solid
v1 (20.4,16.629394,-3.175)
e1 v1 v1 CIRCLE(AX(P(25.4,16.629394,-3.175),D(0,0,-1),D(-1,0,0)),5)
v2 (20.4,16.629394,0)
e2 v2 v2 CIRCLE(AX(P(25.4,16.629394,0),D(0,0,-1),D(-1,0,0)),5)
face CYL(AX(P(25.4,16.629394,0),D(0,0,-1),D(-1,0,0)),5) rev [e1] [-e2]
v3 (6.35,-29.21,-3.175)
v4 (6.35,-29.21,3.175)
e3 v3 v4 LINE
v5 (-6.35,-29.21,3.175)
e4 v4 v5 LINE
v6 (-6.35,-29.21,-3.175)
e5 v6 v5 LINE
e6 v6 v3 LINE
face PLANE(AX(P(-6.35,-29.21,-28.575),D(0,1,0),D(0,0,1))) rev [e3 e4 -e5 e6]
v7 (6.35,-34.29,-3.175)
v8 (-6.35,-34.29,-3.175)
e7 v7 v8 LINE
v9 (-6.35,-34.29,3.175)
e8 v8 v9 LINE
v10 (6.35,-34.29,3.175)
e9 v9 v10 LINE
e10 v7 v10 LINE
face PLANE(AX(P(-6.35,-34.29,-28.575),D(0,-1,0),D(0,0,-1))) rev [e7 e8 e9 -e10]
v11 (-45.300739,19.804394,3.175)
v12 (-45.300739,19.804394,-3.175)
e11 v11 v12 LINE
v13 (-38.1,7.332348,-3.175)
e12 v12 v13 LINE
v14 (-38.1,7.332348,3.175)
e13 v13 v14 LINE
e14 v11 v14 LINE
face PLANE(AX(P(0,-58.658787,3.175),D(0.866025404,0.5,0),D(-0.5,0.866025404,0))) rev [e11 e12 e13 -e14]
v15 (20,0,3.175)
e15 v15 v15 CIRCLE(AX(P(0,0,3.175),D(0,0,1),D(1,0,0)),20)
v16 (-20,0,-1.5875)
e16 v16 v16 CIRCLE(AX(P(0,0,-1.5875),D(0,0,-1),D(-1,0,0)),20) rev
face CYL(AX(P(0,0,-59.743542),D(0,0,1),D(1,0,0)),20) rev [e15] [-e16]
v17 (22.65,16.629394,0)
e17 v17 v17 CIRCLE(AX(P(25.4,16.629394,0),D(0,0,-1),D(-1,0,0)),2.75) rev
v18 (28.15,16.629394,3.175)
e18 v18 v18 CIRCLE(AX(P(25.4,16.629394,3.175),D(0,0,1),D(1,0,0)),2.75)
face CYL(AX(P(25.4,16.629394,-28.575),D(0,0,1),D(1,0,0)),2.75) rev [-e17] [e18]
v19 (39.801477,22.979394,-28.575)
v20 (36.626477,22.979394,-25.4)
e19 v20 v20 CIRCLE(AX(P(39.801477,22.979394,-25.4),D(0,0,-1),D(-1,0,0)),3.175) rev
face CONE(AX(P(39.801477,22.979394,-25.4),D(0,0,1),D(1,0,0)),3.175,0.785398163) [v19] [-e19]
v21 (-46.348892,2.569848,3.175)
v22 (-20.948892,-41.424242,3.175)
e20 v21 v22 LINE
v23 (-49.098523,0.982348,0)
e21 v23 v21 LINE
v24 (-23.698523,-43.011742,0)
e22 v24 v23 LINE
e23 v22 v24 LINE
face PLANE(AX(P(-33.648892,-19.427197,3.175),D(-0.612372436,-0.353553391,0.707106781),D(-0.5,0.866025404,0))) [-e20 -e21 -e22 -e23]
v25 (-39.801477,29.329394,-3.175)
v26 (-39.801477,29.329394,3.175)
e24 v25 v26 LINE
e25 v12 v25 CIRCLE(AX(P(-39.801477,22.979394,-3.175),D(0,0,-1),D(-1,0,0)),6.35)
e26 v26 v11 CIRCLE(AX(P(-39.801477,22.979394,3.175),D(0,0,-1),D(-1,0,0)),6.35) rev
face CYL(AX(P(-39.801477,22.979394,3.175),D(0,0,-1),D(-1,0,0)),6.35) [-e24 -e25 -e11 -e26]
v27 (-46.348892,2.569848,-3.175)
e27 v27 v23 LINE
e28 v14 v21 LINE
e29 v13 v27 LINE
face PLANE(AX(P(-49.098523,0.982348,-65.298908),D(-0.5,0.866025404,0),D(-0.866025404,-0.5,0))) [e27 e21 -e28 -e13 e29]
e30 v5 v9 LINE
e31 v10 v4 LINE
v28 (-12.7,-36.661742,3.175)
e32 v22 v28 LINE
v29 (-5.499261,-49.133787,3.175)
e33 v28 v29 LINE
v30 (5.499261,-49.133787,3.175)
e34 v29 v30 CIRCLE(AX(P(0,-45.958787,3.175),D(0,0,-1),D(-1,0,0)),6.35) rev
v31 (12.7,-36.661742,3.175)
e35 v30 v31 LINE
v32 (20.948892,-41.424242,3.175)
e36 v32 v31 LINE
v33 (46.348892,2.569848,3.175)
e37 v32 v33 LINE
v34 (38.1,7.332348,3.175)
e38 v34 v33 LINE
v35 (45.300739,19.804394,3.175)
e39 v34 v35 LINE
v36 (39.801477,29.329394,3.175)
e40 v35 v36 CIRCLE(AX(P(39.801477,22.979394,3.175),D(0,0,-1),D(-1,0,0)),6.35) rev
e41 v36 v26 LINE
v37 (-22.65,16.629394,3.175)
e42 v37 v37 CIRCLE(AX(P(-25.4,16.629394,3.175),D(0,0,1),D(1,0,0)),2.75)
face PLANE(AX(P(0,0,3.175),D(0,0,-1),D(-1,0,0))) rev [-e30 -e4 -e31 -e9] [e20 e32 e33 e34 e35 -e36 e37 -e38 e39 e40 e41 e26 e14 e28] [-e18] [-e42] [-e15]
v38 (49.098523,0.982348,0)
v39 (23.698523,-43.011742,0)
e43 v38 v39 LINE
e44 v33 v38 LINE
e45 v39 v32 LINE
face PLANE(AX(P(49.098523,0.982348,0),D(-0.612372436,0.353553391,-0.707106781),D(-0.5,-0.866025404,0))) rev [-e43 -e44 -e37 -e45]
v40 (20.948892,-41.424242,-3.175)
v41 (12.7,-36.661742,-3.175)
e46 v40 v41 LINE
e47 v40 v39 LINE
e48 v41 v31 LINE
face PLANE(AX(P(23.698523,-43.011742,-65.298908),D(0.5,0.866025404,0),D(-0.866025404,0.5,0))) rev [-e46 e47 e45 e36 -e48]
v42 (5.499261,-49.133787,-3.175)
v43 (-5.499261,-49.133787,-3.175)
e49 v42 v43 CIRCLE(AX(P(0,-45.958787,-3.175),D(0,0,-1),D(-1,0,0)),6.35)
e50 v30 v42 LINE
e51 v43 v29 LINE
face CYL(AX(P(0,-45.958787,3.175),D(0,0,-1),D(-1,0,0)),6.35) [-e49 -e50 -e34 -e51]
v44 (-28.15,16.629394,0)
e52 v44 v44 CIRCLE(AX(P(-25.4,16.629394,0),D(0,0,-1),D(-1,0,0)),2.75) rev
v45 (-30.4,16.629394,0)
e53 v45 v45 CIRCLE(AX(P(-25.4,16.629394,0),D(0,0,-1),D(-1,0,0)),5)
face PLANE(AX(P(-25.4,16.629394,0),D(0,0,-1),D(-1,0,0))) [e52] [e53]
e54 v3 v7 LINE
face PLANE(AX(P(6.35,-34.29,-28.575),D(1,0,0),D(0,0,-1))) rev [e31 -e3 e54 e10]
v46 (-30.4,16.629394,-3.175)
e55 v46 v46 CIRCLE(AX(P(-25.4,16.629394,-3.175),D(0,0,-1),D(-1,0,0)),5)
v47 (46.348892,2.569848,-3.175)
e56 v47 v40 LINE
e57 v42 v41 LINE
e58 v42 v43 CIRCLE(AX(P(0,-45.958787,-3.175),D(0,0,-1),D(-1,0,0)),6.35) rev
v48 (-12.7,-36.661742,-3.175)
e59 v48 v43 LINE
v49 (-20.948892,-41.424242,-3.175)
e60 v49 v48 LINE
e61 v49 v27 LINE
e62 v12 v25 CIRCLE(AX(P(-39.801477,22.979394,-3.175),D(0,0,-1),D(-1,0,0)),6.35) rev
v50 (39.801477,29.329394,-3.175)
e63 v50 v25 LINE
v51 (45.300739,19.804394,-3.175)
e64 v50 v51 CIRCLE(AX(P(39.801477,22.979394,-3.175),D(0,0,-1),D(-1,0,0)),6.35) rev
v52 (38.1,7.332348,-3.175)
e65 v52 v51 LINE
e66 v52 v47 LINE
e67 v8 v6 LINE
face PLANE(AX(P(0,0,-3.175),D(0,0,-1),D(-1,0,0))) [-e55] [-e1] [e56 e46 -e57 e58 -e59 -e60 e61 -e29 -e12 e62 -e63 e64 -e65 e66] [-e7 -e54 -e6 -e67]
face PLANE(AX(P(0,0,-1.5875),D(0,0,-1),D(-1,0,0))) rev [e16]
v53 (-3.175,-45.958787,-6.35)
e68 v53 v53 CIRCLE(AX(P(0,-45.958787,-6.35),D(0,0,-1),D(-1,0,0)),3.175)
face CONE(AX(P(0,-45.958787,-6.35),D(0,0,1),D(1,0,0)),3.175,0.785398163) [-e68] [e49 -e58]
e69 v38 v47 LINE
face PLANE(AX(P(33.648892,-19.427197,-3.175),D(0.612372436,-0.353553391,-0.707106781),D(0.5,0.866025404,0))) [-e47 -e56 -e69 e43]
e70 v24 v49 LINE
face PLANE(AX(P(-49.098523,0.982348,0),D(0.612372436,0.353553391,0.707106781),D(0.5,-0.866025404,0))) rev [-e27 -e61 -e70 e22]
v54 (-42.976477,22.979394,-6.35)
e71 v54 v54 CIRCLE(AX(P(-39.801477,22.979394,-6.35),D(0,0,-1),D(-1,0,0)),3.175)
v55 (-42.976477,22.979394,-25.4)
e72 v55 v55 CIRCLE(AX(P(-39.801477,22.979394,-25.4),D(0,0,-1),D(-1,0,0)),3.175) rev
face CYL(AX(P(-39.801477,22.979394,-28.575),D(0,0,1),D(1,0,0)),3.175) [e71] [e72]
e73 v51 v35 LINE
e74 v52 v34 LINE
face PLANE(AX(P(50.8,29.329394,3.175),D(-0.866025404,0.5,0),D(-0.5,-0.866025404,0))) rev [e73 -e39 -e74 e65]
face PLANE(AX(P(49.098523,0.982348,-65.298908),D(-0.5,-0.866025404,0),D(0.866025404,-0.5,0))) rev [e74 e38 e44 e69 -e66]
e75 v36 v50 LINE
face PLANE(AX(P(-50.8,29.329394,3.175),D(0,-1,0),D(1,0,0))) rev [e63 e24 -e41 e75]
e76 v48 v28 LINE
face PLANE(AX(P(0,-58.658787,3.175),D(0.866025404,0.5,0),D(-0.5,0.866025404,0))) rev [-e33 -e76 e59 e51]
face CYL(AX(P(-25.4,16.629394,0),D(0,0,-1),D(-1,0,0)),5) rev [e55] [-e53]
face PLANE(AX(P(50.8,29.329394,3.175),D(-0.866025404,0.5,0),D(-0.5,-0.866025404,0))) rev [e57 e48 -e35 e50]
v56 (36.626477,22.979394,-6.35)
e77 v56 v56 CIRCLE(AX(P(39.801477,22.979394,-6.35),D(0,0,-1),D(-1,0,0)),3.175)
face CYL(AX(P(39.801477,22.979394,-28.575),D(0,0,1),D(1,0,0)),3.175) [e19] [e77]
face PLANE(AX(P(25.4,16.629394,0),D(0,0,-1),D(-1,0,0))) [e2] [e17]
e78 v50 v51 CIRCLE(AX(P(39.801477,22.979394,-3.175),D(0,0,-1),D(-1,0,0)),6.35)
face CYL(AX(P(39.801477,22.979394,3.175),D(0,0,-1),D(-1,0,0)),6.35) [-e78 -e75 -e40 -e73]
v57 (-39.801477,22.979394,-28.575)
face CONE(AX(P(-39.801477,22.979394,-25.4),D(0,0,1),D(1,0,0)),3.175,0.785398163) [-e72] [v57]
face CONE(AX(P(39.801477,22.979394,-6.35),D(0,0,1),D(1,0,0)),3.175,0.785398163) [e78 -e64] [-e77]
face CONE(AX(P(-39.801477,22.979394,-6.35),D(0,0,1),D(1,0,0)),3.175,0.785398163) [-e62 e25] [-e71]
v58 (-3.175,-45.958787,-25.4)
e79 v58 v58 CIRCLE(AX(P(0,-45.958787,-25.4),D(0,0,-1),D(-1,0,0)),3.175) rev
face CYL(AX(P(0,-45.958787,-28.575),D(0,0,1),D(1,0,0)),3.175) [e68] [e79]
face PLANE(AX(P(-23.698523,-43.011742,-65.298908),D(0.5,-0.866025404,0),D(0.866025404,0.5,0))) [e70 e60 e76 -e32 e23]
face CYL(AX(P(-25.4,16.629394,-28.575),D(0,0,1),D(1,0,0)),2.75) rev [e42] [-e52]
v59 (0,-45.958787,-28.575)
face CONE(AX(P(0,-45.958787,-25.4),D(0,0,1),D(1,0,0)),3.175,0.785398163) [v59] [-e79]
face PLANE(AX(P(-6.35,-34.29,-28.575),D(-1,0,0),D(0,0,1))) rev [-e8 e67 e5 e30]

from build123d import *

# Parameters (mm, degrees)
BOSS_EXTRUDE1_DEPTH          = 3.175
FILLET1_R                    = 6.35
SKETCH3_R                    = 20
CUT_EXTRUDE1_DEPTH           = 4.7625
SKETCH8_R                    = 3.175
BOSS_EXTRUDE2_DEPTH          = 25.4
CHAMFER1_SIZE                = 3.175
CHAMFER2_SIZE                = 3.175
CIRPATTERN2_COUNT            = 3
CHAMFER1_OF_CIRPATTERN2_SIZE = 3.175
CHAMFER2_OF_CIRPATTERN2_SIZE = 3.175
SKETCH9_W                    = 12.7
SKETCH9_H                    = 5.08
CUT_EXTRUDE4_DEPTH           = 77.643529392
SKETCH10_R                   = 2.75
CUT_EXTRUDE5_DEPTH           = 77.643529392
SKETCH11_R                   = 5
CUT_EXTRUDE6_DEPTH           = 3.175
BOSS_EXTRUDE3_DEPTH          = 6.35
CHAMFER3_SIZE                = 3.175
CHAMFER3_OF_MIRROR2_SIZE     = 3.175


with BuildPart() as part:
    # Sketch1 → Boss-Extrude1 (new, symmetric)
    with BuildSketch(Plane.XY):
        Polygon((50.8, 29.329393675), (0, -58.65878735), (-50.8, 29.329393675), align=None)
    extrude(amount=BOSS_EXTRUDE1_DEPTH, both=True)

    # Fillet1
    fillet1_edges = [part.edges().sort_by_distance(p)[0] for p in [
        (50.8, 29.329393675, 0),
        (0, -58.65878735, 0),
        (-50.8, 29.329393675, 0),
    ]]
    fillet(fillet1_edges, radius=FILLET1_R)

    # Sketch3 → Cut-Extrude1 (cut)
    with BuildSketch(Plane.XY.offset(3.175)):
        Circle(SKETCH3_R)
    extrude(amount=-CUT_EXTRUDE1_DEPTH, mode=Mode.SUBTRACT)

    # Sketch8 → Boss-Extrude2 (add)
    with BuildSketch(Plane(origin=(0, 0, -3.175), x_dir=(-1, 0, 0), z_dir=(0, 0, -1))):
        with Locations((0, -45.95878735)):
            Circle(SKETCH8_R)
    boss_extrude2 = extrude(amount=BOSS_EXTRUDE2_DEPTH)

    # Chamfer1
    chamfer1_edges = [part.edges().sort_by_distance(p)[0] for p in [
        (3.175, -45.95878735, -3.175),
    ]]
    chamfer(chamfer1_edges, length=CHAMFER1_SIZE - 0.0001)  # a hair under: the kernel refuses the full size

    # Chamfer2
    chamfer2_edges = [part.edges().sort_by_distance(p)[0] for p in [
        (3.175, -45.95878735, -28.575),
    ]]
    chamfer(chamfer2_edges, length=CHAMFER2_SIZE - 0.0001)  # a hair under: the kernel refuses the full size

    # CirPattern2: Boss-Extrude2 ×3 about axis
    cirpattern2_axis = Axis((0, 0, 0), (0, 0, 1))
    for i in range(1, CIRPATTERN2_COUNT):
        add(boss_extrude2.rotate(cirpattern2_axis, i * 360 / CIRPATTERN2_COUNT))

    # Chamfer1 of CirPattern2
    chamfer1_of_cirpattern2_edges = [part.edges().sort_by_distance(p)[0] for p in [
        (38.213977372, 25.729024332, -3.175),
        (-41.388977372, 20.229763018, -3.175),
    ]]
    chamfer(chamfer1_of_cirpattern2_edges, length=CHAMFER1_OF_CIRPATTERN2_SIZE - 0.0001)  # a hair under: the kernel refuses the full size

    # Chamfer2 of CirPattern2
    chamfer2_of_cirpattern2_edges = [part.edges().sort_by_distance(p)[0] for p in [
        (38.213977372, 25.729024332, -28.575),
        (-41.388977372, 20.229763018, -28.575),
    ]]
    chamfer(chamfer2_of_cirpattern2_edges, length=CHAMFER2_OF_CIRPATTERN2_SIZE - 0.0001)  # a hair under: the kernel refuses the full size

    # Sketch9 → Cut-Extrude4 (cut, through all)
    with BuildSketch(Plane.XY.offset(3.175)):
        with Locations((0, -31.75)):
            Rectangle(SKETCH9_W, SKETCH9_H)
    extrude(amount=-CUT_EXTRUDE4_DEPTH, mode=Mode.SUBTRACT)

    # Sketch10 → Cut-Extrude5 (cut, through all)
    with BuildSketch(Plane.XY.offset(3.175)):
        with Locations((-25.4, 16.629393675)):
            Circle(SKETCH10_R)
        with Locations((25.4, 16.629393675)):
            Circle(SKETCH10_R)
    extrude(amount=-CUT_EXTRUDE5_DEPTH, mode=Mode.SUBTRACT)

    # Sketch11 → Cut-Extrude6 (cut)
    with BuildSketch(Plane(origin=(0, 0, -3.175), x_dir=(-1, 0, 0), z_dir=(0, 0, -1))):
        with Locations((-25.4, 16.629393675)):
            Circle(SKETCH11_R)
        with Locations((25.4, 16.629393675)):
            Circle(SKETCH11_R)
    extrude(amount=-CUT_EXTRUDE6_DEPTH, mode=Mode.SUBTRACT)

    # Sketch12 → Boss-Extrude3 (add)
    with BuildSketch(Plane.XY.offset(3.175)):
        Polygon((-49.098522628, 0.982348419), (-23.698522628, -43.011742094), (-12.7, -36.661742094), (-38.1, 7.332348419), align=None)
    boss_extrude3 = extrude(amount=-BOSS_EXTRUDE3_DEPTH)

    # Chamfer3
    chamfer3_edges = [part.edges().sort_by_distance(p)[0] for p in [
        (-36.398522628, -21.014696837, -3.175),
        (-36.398522628, -21.014696837, 3.175),
    ]]
    chamfer(chamfer3_edges, length=CHAMFER3_SIZE - 0.0001)  # a hair under: the kernel refuses the full size

    # Mirror2: Boss-Extrude3 across plane
    add(boss_extrude3.mirror(Plane(origin=(0, 0, 0), x_dir=(0, 0, 1), z_dir=(1, 0, 0))))

    # Chamfer3 of Mirror2
    chamfer3_of_mirror2_edges = [part.edges().sort_by_distance(p)[0] for p in [
        (36.398522628, -21.014696837, -3.175),
        (36.398522628, -21.014696837, 3.175),
    ]]
    chamfer(chamfer3_of_mirror2_edges, length=CHAMFER3_OF_MIRROR2_SIZE - 0.0001)  # a hair under: the kernel refuses the full size


solid = part.part
